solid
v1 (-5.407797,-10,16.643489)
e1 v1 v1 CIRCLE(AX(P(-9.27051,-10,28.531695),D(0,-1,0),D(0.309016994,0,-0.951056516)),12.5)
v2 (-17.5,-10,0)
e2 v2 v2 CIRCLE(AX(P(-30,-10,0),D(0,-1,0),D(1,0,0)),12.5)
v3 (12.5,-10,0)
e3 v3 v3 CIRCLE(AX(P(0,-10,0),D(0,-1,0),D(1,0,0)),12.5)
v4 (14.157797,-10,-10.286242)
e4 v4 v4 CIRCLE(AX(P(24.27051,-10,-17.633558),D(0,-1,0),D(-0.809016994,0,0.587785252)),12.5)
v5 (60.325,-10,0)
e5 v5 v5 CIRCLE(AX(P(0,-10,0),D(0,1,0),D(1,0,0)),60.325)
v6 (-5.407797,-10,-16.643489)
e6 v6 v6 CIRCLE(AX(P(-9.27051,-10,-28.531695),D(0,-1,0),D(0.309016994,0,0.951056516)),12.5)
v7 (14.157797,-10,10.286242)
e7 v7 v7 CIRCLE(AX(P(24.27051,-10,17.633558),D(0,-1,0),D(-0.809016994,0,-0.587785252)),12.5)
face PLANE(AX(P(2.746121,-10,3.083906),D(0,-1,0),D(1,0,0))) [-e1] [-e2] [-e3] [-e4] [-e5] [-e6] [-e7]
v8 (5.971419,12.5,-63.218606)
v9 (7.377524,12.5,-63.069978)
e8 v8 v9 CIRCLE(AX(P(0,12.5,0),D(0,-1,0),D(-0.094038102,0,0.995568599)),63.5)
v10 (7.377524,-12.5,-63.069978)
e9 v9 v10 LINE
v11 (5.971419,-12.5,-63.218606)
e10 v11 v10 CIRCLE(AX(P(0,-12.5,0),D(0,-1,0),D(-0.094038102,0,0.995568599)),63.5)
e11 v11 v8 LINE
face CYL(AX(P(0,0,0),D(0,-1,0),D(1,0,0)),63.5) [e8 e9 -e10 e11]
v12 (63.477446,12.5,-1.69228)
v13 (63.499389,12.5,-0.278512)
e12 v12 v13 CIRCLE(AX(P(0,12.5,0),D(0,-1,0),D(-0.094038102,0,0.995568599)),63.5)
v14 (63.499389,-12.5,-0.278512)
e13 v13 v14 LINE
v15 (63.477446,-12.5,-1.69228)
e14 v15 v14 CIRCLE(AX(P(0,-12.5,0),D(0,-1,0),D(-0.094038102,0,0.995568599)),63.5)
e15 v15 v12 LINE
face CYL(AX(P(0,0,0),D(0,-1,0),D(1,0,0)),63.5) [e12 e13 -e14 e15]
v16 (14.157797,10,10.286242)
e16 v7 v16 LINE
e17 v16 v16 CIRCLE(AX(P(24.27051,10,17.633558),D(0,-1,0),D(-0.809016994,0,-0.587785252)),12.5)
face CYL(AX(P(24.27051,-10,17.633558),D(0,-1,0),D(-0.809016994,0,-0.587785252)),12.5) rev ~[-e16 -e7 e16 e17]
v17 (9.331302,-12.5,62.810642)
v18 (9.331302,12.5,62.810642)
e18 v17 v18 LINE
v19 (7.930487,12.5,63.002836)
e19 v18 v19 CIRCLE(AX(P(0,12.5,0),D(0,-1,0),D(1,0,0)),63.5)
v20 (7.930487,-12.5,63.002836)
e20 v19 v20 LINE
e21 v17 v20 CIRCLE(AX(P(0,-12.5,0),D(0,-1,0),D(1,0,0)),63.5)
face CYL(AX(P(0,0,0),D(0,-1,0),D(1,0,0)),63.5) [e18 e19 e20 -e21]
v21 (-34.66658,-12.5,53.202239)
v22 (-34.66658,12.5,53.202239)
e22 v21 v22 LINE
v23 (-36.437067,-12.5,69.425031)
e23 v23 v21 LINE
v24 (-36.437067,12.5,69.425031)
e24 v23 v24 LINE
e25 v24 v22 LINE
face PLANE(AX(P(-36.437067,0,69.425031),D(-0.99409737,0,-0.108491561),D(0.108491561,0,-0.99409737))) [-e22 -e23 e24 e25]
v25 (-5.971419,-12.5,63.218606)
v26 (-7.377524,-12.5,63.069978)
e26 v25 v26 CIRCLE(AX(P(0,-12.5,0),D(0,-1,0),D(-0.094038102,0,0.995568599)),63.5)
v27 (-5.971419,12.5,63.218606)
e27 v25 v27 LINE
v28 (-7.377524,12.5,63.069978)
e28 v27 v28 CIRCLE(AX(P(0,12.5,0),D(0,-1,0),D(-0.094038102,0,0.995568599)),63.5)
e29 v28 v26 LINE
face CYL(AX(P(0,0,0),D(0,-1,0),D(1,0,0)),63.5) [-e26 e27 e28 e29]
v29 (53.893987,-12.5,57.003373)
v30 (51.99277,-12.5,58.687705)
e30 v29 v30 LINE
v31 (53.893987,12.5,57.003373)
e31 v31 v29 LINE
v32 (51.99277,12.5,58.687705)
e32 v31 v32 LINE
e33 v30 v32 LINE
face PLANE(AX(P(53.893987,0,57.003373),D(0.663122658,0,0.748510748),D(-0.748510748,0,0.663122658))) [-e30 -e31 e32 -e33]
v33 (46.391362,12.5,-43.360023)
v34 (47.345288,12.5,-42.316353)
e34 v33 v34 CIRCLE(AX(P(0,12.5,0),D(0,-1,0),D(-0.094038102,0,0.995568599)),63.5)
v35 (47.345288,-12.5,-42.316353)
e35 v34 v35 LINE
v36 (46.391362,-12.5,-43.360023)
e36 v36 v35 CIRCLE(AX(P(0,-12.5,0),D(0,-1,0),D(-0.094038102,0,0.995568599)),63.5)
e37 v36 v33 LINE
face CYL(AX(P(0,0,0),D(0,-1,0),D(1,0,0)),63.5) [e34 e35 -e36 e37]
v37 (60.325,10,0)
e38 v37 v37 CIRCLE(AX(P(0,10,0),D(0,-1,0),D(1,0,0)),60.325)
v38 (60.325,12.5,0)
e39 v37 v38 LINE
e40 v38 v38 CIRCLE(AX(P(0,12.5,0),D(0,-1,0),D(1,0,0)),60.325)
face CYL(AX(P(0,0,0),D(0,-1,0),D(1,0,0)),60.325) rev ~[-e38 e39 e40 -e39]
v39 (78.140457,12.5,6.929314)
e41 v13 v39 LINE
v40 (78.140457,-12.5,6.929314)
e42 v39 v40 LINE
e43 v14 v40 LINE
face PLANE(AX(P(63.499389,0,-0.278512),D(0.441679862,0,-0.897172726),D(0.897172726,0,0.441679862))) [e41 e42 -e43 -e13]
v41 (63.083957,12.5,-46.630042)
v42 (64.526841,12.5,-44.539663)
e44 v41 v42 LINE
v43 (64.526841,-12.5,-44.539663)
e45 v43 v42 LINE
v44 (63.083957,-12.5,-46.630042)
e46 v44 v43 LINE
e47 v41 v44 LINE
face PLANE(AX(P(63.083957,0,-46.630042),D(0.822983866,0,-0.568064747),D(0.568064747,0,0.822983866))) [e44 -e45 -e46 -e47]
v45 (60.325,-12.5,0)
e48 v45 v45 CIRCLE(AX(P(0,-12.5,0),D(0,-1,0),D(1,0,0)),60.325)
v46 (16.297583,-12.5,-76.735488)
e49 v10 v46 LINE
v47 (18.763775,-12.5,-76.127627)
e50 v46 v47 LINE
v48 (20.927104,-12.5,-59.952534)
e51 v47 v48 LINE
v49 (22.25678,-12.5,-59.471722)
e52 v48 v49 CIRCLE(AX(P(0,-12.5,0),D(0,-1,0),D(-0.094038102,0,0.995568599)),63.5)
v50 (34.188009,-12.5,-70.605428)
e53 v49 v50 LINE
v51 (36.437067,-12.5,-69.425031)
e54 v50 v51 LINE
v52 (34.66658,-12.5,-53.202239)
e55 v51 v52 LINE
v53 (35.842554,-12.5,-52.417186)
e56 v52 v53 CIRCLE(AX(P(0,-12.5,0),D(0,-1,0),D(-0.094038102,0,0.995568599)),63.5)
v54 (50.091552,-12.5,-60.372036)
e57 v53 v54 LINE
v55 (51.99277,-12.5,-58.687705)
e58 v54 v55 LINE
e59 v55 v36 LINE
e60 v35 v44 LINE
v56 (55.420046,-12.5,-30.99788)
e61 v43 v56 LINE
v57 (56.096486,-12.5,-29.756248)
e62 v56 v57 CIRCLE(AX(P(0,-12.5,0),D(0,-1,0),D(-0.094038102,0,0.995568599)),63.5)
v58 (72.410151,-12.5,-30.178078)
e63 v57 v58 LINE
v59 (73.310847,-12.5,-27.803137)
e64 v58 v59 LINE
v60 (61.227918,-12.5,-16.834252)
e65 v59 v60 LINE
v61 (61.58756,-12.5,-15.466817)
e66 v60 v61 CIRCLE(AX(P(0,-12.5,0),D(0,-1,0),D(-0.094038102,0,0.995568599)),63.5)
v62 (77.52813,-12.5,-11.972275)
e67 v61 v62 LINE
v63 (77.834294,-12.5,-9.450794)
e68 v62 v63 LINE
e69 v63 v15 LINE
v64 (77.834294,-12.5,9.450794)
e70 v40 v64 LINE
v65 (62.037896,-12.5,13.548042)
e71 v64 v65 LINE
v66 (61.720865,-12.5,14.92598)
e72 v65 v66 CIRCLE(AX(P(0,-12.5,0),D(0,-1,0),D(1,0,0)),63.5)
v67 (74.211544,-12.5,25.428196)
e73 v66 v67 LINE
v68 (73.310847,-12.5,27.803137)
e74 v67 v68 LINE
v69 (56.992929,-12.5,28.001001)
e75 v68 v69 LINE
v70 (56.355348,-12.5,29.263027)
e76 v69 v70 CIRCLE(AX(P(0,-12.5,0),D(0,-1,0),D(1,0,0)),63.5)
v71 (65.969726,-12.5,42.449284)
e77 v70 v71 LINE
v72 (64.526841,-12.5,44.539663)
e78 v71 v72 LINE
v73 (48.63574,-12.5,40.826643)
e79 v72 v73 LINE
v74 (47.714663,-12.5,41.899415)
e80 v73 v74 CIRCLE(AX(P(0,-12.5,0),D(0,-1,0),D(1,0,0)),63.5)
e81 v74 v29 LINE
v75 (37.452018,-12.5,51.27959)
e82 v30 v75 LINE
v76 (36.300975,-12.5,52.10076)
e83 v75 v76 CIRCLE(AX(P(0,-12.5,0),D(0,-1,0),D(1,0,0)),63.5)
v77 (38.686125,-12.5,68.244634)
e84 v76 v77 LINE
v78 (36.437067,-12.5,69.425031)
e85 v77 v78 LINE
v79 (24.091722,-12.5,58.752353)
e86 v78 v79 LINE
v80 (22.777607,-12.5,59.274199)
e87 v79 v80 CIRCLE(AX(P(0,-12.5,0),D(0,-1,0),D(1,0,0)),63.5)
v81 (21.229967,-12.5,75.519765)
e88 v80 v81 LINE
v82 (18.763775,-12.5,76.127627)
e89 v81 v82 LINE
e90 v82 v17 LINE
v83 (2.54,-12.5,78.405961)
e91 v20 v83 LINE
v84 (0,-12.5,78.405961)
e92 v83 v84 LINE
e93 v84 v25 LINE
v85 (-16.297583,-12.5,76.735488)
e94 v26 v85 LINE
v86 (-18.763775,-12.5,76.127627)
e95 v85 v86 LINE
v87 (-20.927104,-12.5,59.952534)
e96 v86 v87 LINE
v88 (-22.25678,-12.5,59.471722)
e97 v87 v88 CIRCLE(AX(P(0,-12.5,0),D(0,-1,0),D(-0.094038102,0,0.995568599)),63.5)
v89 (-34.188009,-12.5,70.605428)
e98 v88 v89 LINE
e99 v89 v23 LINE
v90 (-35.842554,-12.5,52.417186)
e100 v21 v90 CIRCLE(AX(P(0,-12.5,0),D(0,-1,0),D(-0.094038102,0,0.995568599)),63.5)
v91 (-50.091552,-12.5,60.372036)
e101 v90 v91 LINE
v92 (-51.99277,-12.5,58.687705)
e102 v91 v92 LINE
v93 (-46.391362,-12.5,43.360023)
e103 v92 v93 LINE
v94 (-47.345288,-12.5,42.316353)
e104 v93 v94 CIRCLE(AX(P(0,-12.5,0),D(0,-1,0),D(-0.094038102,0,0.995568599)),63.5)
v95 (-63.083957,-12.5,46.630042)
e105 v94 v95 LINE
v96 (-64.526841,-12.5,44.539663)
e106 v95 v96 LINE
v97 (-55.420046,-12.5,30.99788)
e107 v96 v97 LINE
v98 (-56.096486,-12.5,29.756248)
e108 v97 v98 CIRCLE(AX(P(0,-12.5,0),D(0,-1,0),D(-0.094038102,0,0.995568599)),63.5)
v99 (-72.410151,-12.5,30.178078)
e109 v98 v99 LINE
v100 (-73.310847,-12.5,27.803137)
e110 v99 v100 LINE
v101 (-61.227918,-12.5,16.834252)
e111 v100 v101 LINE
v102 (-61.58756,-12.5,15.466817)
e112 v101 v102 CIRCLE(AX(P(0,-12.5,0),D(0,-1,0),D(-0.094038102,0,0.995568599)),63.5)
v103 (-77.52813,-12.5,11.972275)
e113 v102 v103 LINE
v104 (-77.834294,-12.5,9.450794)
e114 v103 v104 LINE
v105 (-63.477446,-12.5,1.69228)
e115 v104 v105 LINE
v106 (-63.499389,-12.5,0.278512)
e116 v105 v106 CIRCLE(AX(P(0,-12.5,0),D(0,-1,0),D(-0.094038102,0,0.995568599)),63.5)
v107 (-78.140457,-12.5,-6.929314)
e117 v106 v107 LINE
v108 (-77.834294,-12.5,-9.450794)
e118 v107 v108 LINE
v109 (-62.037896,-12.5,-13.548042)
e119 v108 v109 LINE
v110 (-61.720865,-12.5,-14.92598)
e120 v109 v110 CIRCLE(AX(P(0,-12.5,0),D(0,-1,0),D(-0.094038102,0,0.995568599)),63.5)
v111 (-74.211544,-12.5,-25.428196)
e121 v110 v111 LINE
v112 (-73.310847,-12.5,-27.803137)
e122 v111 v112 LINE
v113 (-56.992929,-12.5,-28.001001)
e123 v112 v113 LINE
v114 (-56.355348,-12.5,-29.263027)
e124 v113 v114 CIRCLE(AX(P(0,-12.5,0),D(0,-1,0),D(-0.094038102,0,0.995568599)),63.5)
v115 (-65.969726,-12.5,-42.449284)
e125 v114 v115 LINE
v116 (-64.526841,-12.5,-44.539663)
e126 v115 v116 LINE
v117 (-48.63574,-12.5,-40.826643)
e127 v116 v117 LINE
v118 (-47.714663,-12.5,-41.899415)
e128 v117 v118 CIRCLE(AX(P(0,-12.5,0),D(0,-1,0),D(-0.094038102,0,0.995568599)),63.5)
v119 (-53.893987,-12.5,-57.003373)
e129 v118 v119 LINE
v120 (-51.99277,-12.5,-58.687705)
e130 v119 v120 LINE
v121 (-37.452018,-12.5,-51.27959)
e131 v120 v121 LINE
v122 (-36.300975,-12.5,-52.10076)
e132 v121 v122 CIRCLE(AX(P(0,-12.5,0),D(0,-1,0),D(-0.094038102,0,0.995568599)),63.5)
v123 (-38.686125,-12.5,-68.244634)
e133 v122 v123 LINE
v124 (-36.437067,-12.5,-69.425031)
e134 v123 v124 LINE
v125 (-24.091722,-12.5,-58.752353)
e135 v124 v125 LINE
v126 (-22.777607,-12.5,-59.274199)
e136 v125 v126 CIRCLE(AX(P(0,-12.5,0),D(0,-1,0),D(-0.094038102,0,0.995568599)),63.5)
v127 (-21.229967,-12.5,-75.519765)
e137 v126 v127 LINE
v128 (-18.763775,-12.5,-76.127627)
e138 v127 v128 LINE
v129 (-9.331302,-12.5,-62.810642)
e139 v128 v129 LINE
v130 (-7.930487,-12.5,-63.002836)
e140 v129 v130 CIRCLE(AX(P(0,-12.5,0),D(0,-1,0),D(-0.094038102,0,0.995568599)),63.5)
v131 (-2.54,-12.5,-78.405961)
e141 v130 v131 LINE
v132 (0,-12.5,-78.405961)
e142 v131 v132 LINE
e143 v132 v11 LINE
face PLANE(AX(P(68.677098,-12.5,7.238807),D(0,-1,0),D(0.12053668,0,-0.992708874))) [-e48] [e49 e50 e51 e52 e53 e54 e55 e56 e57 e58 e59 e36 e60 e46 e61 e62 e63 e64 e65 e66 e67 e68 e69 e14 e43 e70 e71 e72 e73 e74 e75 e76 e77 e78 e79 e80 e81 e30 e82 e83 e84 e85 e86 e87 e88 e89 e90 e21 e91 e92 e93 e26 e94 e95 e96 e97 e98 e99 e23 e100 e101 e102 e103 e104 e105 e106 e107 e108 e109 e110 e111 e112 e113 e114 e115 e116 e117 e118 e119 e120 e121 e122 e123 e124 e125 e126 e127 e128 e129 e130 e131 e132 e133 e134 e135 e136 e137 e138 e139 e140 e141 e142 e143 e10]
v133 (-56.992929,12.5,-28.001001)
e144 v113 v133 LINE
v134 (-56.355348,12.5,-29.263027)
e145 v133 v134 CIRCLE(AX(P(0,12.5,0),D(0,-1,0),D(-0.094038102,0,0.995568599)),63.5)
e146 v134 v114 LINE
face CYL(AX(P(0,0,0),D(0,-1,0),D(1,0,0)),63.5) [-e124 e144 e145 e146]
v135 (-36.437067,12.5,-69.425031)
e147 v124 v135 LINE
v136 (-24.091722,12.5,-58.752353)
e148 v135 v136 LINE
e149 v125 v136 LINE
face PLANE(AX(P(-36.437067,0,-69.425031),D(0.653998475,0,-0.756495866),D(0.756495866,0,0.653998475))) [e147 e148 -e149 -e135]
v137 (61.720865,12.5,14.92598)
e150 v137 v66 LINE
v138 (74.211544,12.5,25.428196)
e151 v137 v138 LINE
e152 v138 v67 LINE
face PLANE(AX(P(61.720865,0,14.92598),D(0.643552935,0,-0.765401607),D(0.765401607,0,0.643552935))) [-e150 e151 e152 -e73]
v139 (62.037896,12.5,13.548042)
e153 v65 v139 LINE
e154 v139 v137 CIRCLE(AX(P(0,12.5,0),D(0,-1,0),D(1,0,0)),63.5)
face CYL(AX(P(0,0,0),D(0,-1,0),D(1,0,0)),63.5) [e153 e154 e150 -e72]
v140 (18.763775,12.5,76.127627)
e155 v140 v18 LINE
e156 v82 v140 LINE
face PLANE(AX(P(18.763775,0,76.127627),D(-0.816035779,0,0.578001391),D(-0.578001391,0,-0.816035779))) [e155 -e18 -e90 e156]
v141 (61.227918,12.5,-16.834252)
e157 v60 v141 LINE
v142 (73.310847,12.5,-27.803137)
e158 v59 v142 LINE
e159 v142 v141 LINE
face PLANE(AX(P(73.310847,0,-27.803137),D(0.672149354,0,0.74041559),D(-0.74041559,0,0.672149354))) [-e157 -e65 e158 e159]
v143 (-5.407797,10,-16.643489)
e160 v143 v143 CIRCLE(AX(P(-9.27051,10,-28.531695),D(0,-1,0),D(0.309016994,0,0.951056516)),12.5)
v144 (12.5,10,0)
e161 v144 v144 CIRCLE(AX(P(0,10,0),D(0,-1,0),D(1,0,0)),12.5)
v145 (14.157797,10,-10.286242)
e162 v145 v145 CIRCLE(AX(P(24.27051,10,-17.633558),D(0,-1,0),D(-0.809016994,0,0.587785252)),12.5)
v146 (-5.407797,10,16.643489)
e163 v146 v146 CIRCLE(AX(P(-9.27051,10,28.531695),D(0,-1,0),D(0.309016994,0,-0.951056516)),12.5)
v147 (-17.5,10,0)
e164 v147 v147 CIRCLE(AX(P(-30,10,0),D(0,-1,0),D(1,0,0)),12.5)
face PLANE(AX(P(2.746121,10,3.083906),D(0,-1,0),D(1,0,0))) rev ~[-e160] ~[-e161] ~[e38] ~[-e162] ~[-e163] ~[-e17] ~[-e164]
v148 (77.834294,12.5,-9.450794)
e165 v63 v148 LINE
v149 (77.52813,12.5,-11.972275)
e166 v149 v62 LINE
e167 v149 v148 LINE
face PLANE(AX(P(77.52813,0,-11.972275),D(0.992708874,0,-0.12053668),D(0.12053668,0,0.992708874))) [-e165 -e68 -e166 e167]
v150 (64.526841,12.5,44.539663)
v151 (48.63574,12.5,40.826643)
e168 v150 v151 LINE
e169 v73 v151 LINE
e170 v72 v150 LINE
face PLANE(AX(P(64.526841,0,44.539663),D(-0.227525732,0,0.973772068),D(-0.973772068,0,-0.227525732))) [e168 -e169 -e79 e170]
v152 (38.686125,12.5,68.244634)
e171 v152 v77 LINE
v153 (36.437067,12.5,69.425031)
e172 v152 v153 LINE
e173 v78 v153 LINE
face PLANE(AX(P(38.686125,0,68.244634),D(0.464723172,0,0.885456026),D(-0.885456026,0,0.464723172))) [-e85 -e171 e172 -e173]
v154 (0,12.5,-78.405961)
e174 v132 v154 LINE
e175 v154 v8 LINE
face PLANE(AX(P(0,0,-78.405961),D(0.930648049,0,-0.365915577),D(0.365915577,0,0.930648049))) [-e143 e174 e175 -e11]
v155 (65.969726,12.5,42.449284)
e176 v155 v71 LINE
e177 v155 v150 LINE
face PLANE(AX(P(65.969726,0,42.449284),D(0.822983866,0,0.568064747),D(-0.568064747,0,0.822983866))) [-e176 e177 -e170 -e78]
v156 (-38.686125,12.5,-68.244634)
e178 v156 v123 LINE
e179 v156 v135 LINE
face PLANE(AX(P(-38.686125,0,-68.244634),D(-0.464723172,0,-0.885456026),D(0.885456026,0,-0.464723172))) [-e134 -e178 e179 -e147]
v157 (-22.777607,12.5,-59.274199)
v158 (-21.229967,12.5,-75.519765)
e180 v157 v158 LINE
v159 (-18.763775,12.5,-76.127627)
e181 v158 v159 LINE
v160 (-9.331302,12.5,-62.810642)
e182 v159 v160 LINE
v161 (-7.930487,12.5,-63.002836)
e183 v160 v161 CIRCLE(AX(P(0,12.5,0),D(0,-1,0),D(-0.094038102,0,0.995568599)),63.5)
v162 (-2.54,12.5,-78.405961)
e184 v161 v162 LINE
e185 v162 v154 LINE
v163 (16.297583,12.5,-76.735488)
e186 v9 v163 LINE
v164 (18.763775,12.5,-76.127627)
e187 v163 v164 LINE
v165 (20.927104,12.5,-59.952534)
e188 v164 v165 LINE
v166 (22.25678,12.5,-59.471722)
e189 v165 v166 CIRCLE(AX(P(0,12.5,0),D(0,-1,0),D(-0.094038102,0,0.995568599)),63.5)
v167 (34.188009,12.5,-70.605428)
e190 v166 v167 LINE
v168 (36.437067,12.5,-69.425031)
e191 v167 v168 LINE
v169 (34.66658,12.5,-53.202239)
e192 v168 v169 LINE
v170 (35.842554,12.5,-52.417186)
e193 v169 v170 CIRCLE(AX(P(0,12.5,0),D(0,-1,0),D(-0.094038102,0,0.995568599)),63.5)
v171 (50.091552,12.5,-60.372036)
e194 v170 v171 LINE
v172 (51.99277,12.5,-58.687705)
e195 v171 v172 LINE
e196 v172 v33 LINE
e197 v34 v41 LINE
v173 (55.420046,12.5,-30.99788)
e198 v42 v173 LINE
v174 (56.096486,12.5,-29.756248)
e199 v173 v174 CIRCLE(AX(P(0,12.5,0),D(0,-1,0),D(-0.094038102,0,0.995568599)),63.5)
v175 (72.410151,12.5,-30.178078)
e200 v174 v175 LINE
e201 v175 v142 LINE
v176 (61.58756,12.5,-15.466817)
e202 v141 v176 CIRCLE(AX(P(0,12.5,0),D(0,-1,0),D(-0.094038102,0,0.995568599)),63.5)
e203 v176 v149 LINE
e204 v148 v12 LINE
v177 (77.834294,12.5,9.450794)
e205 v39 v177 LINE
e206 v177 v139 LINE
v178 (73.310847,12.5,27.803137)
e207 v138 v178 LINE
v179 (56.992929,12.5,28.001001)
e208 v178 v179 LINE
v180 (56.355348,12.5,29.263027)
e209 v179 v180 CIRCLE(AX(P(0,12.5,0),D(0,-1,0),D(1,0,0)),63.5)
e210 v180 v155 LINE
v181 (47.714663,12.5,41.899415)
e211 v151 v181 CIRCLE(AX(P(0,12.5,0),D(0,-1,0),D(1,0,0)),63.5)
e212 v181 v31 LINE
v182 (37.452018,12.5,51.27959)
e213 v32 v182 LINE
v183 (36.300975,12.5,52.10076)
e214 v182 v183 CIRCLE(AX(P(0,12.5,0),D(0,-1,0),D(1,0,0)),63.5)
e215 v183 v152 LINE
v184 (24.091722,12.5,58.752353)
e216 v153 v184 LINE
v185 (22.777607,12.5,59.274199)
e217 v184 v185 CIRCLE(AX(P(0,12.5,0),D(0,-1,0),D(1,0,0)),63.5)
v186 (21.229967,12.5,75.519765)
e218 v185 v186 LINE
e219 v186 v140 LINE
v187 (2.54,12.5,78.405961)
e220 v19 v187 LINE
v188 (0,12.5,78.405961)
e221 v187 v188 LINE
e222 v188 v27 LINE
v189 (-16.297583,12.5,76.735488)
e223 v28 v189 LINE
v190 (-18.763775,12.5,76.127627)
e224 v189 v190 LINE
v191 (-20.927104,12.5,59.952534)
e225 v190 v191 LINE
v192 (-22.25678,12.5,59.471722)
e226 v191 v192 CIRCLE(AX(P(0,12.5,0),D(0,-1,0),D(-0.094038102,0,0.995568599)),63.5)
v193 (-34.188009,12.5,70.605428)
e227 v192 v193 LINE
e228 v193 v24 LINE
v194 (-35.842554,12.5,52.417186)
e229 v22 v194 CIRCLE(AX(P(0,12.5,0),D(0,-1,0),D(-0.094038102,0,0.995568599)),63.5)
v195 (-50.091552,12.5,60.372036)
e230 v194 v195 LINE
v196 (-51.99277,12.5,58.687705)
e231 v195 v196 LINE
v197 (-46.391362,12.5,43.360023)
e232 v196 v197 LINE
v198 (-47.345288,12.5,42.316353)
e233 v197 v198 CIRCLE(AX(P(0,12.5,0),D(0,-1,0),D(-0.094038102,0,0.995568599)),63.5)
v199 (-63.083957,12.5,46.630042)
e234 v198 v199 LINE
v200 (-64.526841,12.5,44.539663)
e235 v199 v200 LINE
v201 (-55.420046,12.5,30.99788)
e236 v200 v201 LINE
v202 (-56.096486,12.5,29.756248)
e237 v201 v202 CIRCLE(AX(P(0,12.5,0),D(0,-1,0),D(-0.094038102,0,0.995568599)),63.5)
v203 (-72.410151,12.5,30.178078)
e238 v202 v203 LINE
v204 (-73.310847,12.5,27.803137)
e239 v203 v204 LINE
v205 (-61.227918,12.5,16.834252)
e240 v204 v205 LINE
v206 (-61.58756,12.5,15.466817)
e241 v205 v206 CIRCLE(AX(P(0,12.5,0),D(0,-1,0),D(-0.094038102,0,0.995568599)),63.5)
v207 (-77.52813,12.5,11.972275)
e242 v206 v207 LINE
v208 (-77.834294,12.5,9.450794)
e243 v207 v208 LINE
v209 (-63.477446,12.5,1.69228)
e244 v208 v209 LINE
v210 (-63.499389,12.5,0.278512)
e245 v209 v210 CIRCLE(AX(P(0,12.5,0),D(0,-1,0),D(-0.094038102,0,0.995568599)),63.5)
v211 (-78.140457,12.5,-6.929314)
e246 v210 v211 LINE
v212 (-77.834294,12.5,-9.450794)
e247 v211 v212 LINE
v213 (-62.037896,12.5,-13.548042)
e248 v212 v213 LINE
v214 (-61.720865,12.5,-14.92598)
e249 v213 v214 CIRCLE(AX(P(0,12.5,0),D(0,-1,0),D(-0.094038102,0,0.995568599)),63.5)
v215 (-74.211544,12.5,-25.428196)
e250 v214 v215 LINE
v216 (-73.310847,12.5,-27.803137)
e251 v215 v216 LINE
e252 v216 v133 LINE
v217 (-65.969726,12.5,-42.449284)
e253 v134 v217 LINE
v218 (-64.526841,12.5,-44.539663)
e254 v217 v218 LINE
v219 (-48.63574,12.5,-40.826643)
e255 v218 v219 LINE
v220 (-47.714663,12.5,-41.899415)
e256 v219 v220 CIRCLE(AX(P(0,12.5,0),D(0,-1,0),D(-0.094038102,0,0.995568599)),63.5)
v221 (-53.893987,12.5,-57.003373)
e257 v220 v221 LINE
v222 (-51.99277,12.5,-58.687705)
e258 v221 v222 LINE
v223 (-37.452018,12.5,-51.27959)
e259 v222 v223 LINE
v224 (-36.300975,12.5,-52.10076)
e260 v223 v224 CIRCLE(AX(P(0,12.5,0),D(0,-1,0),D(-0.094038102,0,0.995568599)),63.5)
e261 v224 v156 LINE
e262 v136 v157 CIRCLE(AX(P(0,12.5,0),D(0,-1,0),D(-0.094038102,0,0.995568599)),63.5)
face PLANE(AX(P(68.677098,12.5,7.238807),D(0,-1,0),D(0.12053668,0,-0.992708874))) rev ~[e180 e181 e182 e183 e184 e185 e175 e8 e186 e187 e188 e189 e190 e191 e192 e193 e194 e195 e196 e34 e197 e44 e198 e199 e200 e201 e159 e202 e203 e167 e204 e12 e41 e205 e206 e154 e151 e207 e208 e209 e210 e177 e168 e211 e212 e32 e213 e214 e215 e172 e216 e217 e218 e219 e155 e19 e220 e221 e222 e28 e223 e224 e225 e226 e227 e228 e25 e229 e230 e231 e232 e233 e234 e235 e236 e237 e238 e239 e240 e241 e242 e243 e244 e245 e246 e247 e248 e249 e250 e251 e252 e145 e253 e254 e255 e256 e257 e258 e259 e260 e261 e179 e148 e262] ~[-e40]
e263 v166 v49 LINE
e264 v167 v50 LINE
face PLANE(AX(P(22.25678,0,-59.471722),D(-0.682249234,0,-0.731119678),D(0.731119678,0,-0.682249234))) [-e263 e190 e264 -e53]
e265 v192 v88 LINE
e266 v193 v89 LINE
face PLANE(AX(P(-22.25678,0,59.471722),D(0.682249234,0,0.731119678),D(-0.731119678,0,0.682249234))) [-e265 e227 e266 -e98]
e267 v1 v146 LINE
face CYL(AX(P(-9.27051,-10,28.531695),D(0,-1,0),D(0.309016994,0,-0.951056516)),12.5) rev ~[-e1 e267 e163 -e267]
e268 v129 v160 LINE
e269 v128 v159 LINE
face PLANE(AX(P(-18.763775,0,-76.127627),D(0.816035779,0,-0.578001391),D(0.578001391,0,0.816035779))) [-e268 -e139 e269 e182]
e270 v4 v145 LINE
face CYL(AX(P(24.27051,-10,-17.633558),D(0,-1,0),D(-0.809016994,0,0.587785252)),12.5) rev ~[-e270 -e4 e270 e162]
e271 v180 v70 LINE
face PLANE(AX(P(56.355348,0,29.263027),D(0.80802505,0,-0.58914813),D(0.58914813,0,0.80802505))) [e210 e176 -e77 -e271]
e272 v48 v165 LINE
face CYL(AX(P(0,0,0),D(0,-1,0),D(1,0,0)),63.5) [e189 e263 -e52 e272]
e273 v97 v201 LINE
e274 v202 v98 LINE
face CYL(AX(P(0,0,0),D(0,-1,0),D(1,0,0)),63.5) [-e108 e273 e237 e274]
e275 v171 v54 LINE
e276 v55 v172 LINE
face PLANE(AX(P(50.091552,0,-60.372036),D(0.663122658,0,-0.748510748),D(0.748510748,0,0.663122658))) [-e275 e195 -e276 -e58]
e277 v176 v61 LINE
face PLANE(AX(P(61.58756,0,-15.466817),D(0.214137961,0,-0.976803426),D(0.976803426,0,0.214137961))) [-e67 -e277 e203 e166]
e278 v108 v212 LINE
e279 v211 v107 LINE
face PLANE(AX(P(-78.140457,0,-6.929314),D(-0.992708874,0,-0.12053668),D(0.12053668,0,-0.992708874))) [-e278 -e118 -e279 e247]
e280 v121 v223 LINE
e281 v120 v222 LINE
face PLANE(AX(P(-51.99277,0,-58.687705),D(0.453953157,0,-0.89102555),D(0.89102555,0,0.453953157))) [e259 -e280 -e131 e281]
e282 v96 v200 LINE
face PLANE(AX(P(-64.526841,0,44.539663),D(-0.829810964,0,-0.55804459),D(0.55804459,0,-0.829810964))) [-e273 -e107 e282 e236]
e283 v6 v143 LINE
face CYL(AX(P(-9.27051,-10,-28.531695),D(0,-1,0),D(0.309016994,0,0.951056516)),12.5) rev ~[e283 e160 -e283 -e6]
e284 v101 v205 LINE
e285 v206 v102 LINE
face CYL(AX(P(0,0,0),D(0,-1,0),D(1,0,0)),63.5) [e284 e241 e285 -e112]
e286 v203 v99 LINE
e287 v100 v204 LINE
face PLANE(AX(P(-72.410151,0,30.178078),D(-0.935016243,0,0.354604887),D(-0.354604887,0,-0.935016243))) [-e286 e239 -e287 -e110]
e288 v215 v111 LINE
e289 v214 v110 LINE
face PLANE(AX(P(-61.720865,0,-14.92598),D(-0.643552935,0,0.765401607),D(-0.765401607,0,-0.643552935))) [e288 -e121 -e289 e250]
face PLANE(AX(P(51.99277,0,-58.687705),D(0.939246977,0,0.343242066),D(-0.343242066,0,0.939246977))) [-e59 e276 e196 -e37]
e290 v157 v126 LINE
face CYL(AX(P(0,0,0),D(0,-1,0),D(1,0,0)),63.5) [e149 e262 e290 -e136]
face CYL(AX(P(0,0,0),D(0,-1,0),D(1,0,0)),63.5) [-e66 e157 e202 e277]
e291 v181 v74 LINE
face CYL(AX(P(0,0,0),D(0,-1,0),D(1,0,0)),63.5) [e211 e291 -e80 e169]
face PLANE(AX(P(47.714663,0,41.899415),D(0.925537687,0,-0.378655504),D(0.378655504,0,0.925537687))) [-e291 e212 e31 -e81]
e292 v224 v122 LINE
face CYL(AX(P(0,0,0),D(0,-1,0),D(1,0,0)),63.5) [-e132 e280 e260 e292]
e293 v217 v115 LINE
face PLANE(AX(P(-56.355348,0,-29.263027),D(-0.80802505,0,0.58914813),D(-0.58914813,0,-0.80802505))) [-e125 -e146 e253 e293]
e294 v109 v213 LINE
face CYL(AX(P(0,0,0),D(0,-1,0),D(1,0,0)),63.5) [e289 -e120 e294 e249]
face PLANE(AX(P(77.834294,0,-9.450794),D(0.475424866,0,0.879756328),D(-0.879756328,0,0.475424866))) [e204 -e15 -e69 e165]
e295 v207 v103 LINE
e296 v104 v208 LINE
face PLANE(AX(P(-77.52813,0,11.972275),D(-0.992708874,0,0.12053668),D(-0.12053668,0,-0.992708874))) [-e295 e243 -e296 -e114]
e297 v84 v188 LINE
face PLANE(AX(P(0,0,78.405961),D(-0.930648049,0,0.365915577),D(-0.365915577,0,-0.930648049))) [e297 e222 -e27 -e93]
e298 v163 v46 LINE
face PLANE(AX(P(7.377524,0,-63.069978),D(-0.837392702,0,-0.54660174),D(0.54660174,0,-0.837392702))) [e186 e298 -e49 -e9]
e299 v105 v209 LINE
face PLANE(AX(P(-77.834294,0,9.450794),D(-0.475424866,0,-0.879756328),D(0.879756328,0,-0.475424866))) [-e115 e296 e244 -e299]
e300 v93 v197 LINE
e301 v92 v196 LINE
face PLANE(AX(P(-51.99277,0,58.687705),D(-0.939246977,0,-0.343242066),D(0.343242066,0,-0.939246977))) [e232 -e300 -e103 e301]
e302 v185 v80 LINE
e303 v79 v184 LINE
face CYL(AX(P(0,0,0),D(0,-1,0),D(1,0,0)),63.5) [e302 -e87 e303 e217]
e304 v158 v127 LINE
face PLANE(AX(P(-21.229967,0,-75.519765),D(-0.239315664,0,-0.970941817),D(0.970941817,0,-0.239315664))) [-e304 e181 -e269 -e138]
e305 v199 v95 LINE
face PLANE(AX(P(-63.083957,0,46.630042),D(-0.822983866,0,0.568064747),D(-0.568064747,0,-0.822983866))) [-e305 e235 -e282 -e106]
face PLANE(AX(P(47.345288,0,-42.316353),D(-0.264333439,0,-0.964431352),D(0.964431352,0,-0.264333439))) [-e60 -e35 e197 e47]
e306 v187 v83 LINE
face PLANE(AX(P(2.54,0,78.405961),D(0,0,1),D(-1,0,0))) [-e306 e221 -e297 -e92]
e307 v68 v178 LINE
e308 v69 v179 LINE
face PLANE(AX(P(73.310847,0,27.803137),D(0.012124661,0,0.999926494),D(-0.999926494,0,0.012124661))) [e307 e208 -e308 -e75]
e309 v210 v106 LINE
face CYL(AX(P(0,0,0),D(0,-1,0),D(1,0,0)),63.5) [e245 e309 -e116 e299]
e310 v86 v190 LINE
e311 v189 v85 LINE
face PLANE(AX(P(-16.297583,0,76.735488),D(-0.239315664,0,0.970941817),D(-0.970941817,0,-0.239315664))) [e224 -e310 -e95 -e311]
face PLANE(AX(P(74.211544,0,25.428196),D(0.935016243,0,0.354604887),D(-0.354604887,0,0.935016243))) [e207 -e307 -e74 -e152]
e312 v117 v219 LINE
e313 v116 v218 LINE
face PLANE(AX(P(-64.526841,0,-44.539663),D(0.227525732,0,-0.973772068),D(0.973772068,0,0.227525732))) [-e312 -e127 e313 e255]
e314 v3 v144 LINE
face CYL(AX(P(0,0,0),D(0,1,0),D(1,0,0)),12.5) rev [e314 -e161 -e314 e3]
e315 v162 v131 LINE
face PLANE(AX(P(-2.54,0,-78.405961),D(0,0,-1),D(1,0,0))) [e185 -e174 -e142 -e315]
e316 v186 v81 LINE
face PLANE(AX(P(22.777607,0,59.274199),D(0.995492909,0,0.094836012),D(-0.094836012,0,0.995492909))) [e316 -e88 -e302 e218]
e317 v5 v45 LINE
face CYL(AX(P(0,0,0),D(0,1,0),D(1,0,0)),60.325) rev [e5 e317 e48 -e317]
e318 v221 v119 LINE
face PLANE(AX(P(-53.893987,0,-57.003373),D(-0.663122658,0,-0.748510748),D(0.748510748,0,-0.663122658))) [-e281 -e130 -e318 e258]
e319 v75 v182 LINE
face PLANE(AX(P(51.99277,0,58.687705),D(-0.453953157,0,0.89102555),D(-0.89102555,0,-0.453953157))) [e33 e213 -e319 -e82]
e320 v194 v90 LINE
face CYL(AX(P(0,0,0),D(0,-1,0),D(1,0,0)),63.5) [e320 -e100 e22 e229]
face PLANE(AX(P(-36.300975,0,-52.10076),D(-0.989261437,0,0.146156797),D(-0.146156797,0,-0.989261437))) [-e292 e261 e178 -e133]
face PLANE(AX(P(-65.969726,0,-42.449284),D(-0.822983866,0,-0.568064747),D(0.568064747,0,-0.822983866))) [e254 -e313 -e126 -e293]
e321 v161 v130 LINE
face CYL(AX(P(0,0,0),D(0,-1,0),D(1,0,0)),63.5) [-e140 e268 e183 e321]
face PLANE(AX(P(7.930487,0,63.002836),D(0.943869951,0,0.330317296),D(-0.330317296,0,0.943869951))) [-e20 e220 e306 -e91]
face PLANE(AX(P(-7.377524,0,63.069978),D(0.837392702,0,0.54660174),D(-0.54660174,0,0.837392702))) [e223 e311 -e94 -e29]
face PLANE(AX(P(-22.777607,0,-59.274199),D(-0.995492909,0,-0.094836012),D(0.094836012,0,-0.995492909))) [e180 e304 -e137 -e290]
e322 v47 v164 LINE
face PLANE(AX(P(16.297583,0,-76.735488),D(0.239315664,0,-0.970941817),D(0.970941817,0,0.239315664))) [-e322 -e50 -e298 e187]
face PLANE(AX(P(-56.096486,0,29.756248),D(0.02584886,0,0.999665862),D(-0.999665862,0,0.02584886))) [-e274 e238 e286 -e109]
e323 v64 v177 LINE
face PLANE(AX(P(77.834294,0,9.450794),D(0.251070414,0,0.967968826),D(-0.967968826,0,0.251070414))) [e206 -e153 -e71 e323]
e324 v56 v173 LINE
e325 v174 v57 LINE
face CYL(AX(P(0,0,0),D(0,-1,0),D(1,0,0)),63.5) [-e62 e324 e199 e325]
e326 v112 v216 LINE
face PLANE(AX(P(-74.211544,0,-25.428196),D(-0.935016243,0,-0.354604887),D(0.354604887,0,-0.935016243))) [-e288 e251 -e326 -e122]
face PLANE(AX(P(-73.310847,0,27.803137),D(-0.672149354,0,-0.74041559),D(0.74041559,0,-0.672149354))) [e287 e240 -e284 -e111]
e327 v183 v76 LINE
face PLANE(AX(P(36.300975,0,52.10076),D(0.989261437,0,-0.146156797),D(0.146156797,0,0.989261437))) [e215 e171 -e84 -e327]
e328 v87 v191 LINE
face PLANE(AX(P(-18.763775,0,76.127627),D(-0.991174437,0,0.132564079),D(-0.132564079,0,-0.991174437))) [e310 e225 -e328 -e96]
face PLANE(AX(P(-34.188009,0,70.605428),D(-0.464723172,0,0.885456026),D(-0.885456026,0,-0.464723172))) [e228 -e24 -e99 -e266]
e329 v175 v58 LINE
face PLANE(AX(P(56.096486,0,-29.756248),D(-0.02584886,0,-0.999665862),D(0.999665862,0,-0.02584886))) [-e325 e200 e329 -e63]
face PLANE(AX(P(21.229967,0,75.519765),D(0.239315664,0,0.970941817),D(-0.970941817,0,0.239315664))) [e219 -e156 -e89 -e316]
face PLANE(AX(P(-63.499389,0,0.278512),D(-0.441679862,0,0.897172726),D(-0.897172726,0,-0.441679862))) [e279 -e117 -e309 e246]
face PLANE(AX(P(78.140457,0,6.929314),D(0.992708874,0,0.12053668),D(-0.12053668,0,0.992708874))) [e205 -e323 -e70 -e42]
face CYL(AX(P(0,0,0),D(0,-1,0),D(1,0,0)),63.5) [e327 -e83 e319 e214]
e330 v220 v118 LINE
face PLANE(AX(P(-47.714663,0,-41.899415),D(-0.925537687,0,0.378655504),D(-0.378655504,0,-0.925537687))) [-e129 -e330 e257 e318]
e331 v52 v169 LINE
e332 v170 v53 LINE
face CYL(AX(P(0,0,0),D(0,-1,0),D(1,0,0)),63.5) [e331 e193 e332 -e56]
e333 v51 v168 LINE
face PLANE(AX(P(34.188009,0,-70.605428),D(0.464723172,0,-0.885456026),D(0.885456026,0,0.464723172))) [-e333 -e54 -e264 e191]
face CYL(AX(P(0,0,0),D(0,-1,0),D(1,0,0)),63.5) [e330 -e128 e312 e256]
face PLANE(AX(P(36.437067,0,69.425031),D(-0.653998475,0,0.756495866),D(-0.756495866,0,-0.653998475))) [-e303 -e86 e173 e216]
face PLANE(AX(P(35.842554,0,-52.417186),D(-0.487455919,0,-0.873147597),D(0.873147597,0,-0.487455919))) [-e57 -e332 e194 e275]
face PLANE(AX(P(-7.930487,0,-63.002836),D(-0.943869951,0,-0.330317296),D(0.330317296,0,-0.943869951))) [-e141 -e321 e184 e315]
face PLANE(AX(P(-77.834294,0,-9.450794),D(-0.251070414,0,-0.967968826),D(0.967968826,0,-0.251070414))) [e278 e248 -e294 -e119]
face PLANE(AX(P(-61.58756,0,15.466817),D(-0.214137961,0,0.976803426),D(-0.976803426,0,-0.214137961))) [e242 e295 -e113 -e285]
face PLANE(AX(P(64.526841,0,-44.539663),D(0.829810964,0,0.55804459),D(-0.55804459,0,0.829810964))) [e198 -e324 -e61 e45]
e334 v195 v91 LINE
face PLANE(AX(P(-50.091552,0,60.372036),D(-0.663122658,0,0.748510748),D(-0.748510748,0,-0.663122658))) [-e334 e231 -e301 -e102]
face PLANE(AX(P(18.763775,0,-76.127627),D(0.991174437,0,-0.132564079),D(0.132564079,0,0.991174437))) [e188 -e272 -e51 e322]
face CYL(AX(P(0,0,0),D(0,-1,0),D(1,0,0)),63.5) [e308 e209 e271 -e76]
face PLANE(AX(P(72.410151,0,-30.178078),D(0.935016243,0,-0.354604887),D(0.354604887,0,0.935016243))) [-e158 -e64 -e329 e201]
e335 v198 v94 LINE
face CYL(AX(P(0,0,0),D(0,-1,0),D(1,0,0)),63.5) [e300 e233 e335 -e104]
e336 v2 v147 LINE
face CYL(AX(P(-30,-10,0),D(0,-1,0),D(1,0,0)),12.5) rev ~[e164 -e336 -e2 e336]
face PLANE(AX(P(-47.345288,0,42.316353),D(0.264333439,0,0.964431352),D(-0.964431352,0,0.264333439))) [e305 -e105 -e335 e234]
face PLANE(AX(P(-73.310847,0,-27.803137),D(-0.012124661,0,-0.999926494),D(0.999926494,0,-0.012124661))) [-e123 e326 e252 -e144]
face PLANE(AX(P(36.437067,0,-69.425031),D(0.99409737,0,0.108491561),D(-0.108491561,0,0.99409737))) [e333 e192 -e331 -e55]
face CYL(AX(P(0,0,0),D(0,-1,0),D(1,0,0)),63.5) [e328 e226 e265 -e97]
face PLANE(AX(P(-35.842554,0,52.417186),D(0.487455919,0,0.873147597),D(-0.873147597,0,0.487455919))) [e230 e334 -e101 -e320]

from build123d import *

# Parameters (mm, degrees)
F0_R            = 60.325
F0_R_2          = 12.5
F1_DEPTH        = 10
F2_DEPTH        = 12.5
F3_DEPTH        = 12.5
F3_COPIES_COUNT = 26
F4_R            = 12.5
F5_DEPTH        = 22.501
F5_COPIES_COUNT = 5


# Not quite as in the source:
# - a pattern or mirror of a feature is missing from the dataset's text; its kind, count and spacing are read off the source's solid


with BuildPart() as f1:
    # F0 (on Front) → F1 (new body, symmetric)
    with BuildSketch(Plane.XZ):
        with BuildLine():
            ThreePointArc((-5.9714194874, 63.2186060373), (-42.7379507145, -46.9650675367), (63.5, 0))
            ThreePointArc((63.5, 0), (47.6226622583, 42.0039526644), (7.9304869469, 63.0028362598))
            ThreePointArc((7.9304869469, 63.0028362598), (0.9854569889, 63.4923528822), (-5.9714194874, 63.2186060373))
        make_face()
        Circle(F0_R, mode=Mode.SUBTRACT)
        Circle(F0_R)
        Circle(F0_R_2, mode=Mode.SUBTRACT)
    extrude(amount=F1_DEPTH, both=True)

    # F0 (on Front) → F2 (join, symmetric)
    with BuildSketch(Plane.XZ):
        with BuildLine():
            ThreePointArc((-5.9714194874, 63.2186060373), (-42.7379507145, -46.9650675367), (63.5, 0))
            ThreePointArc((63.5, 0), (47.6226622583, 42.0039526644), (7.9304869469, 63.0028362598))
            ThreePointArc((7.9304869469, 63.0028362598), (0.9854569889, 63.4923528822), (-5.9714194874, 63.2186060373))
        make_face()
        Circle(F0_R, mode=Mode.SUBTRACT)
    extrude(amount=F2_DEPTH, both=True)

    # F0 (on Front) → F3 (join, symmetric)
    with BuildSketch(Plane.XZ):
        with BuildLine():
            ThreePointArc((-5.9714194874, 63.2186060373), (0.9854569889, 63.4923528822), (7.9304869469, 63.0028362598))
            Line((7.9304869469, 63.0028362598), (2.54, 78.4059613943))
            Line((2.54, 78.4059613943), (0, 78.4059613943))
            Line((0, 78.4059613943), (-5.9714194874, 63.2186060373))
        make_face()
    f3 = extrude(amount=F3_DEPTH, both=True)

    # F3_copies: F3 ×26 about axis
    f3_copies_axis = Axis((0, 0, 0), (0, 1, 0))
    for i in range(1, F3_COPIES_COUNT):
        add(f3.rotate(f3_copies_axis, i * 360 / F3_COPIES_COUNT))

    # F4 (on face) → F5 (cut, through all)
    with BuildSketch(Plane.XZ.offset(10)):
        with Locations((-30, 0)):
            Circle(F4_R)
    f5 = extrude(amount=-F5_DEPTH, mode=Mode.SUBTRACT)

    # F5_copies: F5 ×5 about axis
    f5_copies_axis = Axis((0, 0, 0), (0, 1, 0))
    for i in range(1, F5_COPIES_COUNT):
        add(f5.rotate(f5_copies_axis, i * 360 / F5_COPIES_COUNT), mode=Mode.SUBTRACT)


solid = f1.part
